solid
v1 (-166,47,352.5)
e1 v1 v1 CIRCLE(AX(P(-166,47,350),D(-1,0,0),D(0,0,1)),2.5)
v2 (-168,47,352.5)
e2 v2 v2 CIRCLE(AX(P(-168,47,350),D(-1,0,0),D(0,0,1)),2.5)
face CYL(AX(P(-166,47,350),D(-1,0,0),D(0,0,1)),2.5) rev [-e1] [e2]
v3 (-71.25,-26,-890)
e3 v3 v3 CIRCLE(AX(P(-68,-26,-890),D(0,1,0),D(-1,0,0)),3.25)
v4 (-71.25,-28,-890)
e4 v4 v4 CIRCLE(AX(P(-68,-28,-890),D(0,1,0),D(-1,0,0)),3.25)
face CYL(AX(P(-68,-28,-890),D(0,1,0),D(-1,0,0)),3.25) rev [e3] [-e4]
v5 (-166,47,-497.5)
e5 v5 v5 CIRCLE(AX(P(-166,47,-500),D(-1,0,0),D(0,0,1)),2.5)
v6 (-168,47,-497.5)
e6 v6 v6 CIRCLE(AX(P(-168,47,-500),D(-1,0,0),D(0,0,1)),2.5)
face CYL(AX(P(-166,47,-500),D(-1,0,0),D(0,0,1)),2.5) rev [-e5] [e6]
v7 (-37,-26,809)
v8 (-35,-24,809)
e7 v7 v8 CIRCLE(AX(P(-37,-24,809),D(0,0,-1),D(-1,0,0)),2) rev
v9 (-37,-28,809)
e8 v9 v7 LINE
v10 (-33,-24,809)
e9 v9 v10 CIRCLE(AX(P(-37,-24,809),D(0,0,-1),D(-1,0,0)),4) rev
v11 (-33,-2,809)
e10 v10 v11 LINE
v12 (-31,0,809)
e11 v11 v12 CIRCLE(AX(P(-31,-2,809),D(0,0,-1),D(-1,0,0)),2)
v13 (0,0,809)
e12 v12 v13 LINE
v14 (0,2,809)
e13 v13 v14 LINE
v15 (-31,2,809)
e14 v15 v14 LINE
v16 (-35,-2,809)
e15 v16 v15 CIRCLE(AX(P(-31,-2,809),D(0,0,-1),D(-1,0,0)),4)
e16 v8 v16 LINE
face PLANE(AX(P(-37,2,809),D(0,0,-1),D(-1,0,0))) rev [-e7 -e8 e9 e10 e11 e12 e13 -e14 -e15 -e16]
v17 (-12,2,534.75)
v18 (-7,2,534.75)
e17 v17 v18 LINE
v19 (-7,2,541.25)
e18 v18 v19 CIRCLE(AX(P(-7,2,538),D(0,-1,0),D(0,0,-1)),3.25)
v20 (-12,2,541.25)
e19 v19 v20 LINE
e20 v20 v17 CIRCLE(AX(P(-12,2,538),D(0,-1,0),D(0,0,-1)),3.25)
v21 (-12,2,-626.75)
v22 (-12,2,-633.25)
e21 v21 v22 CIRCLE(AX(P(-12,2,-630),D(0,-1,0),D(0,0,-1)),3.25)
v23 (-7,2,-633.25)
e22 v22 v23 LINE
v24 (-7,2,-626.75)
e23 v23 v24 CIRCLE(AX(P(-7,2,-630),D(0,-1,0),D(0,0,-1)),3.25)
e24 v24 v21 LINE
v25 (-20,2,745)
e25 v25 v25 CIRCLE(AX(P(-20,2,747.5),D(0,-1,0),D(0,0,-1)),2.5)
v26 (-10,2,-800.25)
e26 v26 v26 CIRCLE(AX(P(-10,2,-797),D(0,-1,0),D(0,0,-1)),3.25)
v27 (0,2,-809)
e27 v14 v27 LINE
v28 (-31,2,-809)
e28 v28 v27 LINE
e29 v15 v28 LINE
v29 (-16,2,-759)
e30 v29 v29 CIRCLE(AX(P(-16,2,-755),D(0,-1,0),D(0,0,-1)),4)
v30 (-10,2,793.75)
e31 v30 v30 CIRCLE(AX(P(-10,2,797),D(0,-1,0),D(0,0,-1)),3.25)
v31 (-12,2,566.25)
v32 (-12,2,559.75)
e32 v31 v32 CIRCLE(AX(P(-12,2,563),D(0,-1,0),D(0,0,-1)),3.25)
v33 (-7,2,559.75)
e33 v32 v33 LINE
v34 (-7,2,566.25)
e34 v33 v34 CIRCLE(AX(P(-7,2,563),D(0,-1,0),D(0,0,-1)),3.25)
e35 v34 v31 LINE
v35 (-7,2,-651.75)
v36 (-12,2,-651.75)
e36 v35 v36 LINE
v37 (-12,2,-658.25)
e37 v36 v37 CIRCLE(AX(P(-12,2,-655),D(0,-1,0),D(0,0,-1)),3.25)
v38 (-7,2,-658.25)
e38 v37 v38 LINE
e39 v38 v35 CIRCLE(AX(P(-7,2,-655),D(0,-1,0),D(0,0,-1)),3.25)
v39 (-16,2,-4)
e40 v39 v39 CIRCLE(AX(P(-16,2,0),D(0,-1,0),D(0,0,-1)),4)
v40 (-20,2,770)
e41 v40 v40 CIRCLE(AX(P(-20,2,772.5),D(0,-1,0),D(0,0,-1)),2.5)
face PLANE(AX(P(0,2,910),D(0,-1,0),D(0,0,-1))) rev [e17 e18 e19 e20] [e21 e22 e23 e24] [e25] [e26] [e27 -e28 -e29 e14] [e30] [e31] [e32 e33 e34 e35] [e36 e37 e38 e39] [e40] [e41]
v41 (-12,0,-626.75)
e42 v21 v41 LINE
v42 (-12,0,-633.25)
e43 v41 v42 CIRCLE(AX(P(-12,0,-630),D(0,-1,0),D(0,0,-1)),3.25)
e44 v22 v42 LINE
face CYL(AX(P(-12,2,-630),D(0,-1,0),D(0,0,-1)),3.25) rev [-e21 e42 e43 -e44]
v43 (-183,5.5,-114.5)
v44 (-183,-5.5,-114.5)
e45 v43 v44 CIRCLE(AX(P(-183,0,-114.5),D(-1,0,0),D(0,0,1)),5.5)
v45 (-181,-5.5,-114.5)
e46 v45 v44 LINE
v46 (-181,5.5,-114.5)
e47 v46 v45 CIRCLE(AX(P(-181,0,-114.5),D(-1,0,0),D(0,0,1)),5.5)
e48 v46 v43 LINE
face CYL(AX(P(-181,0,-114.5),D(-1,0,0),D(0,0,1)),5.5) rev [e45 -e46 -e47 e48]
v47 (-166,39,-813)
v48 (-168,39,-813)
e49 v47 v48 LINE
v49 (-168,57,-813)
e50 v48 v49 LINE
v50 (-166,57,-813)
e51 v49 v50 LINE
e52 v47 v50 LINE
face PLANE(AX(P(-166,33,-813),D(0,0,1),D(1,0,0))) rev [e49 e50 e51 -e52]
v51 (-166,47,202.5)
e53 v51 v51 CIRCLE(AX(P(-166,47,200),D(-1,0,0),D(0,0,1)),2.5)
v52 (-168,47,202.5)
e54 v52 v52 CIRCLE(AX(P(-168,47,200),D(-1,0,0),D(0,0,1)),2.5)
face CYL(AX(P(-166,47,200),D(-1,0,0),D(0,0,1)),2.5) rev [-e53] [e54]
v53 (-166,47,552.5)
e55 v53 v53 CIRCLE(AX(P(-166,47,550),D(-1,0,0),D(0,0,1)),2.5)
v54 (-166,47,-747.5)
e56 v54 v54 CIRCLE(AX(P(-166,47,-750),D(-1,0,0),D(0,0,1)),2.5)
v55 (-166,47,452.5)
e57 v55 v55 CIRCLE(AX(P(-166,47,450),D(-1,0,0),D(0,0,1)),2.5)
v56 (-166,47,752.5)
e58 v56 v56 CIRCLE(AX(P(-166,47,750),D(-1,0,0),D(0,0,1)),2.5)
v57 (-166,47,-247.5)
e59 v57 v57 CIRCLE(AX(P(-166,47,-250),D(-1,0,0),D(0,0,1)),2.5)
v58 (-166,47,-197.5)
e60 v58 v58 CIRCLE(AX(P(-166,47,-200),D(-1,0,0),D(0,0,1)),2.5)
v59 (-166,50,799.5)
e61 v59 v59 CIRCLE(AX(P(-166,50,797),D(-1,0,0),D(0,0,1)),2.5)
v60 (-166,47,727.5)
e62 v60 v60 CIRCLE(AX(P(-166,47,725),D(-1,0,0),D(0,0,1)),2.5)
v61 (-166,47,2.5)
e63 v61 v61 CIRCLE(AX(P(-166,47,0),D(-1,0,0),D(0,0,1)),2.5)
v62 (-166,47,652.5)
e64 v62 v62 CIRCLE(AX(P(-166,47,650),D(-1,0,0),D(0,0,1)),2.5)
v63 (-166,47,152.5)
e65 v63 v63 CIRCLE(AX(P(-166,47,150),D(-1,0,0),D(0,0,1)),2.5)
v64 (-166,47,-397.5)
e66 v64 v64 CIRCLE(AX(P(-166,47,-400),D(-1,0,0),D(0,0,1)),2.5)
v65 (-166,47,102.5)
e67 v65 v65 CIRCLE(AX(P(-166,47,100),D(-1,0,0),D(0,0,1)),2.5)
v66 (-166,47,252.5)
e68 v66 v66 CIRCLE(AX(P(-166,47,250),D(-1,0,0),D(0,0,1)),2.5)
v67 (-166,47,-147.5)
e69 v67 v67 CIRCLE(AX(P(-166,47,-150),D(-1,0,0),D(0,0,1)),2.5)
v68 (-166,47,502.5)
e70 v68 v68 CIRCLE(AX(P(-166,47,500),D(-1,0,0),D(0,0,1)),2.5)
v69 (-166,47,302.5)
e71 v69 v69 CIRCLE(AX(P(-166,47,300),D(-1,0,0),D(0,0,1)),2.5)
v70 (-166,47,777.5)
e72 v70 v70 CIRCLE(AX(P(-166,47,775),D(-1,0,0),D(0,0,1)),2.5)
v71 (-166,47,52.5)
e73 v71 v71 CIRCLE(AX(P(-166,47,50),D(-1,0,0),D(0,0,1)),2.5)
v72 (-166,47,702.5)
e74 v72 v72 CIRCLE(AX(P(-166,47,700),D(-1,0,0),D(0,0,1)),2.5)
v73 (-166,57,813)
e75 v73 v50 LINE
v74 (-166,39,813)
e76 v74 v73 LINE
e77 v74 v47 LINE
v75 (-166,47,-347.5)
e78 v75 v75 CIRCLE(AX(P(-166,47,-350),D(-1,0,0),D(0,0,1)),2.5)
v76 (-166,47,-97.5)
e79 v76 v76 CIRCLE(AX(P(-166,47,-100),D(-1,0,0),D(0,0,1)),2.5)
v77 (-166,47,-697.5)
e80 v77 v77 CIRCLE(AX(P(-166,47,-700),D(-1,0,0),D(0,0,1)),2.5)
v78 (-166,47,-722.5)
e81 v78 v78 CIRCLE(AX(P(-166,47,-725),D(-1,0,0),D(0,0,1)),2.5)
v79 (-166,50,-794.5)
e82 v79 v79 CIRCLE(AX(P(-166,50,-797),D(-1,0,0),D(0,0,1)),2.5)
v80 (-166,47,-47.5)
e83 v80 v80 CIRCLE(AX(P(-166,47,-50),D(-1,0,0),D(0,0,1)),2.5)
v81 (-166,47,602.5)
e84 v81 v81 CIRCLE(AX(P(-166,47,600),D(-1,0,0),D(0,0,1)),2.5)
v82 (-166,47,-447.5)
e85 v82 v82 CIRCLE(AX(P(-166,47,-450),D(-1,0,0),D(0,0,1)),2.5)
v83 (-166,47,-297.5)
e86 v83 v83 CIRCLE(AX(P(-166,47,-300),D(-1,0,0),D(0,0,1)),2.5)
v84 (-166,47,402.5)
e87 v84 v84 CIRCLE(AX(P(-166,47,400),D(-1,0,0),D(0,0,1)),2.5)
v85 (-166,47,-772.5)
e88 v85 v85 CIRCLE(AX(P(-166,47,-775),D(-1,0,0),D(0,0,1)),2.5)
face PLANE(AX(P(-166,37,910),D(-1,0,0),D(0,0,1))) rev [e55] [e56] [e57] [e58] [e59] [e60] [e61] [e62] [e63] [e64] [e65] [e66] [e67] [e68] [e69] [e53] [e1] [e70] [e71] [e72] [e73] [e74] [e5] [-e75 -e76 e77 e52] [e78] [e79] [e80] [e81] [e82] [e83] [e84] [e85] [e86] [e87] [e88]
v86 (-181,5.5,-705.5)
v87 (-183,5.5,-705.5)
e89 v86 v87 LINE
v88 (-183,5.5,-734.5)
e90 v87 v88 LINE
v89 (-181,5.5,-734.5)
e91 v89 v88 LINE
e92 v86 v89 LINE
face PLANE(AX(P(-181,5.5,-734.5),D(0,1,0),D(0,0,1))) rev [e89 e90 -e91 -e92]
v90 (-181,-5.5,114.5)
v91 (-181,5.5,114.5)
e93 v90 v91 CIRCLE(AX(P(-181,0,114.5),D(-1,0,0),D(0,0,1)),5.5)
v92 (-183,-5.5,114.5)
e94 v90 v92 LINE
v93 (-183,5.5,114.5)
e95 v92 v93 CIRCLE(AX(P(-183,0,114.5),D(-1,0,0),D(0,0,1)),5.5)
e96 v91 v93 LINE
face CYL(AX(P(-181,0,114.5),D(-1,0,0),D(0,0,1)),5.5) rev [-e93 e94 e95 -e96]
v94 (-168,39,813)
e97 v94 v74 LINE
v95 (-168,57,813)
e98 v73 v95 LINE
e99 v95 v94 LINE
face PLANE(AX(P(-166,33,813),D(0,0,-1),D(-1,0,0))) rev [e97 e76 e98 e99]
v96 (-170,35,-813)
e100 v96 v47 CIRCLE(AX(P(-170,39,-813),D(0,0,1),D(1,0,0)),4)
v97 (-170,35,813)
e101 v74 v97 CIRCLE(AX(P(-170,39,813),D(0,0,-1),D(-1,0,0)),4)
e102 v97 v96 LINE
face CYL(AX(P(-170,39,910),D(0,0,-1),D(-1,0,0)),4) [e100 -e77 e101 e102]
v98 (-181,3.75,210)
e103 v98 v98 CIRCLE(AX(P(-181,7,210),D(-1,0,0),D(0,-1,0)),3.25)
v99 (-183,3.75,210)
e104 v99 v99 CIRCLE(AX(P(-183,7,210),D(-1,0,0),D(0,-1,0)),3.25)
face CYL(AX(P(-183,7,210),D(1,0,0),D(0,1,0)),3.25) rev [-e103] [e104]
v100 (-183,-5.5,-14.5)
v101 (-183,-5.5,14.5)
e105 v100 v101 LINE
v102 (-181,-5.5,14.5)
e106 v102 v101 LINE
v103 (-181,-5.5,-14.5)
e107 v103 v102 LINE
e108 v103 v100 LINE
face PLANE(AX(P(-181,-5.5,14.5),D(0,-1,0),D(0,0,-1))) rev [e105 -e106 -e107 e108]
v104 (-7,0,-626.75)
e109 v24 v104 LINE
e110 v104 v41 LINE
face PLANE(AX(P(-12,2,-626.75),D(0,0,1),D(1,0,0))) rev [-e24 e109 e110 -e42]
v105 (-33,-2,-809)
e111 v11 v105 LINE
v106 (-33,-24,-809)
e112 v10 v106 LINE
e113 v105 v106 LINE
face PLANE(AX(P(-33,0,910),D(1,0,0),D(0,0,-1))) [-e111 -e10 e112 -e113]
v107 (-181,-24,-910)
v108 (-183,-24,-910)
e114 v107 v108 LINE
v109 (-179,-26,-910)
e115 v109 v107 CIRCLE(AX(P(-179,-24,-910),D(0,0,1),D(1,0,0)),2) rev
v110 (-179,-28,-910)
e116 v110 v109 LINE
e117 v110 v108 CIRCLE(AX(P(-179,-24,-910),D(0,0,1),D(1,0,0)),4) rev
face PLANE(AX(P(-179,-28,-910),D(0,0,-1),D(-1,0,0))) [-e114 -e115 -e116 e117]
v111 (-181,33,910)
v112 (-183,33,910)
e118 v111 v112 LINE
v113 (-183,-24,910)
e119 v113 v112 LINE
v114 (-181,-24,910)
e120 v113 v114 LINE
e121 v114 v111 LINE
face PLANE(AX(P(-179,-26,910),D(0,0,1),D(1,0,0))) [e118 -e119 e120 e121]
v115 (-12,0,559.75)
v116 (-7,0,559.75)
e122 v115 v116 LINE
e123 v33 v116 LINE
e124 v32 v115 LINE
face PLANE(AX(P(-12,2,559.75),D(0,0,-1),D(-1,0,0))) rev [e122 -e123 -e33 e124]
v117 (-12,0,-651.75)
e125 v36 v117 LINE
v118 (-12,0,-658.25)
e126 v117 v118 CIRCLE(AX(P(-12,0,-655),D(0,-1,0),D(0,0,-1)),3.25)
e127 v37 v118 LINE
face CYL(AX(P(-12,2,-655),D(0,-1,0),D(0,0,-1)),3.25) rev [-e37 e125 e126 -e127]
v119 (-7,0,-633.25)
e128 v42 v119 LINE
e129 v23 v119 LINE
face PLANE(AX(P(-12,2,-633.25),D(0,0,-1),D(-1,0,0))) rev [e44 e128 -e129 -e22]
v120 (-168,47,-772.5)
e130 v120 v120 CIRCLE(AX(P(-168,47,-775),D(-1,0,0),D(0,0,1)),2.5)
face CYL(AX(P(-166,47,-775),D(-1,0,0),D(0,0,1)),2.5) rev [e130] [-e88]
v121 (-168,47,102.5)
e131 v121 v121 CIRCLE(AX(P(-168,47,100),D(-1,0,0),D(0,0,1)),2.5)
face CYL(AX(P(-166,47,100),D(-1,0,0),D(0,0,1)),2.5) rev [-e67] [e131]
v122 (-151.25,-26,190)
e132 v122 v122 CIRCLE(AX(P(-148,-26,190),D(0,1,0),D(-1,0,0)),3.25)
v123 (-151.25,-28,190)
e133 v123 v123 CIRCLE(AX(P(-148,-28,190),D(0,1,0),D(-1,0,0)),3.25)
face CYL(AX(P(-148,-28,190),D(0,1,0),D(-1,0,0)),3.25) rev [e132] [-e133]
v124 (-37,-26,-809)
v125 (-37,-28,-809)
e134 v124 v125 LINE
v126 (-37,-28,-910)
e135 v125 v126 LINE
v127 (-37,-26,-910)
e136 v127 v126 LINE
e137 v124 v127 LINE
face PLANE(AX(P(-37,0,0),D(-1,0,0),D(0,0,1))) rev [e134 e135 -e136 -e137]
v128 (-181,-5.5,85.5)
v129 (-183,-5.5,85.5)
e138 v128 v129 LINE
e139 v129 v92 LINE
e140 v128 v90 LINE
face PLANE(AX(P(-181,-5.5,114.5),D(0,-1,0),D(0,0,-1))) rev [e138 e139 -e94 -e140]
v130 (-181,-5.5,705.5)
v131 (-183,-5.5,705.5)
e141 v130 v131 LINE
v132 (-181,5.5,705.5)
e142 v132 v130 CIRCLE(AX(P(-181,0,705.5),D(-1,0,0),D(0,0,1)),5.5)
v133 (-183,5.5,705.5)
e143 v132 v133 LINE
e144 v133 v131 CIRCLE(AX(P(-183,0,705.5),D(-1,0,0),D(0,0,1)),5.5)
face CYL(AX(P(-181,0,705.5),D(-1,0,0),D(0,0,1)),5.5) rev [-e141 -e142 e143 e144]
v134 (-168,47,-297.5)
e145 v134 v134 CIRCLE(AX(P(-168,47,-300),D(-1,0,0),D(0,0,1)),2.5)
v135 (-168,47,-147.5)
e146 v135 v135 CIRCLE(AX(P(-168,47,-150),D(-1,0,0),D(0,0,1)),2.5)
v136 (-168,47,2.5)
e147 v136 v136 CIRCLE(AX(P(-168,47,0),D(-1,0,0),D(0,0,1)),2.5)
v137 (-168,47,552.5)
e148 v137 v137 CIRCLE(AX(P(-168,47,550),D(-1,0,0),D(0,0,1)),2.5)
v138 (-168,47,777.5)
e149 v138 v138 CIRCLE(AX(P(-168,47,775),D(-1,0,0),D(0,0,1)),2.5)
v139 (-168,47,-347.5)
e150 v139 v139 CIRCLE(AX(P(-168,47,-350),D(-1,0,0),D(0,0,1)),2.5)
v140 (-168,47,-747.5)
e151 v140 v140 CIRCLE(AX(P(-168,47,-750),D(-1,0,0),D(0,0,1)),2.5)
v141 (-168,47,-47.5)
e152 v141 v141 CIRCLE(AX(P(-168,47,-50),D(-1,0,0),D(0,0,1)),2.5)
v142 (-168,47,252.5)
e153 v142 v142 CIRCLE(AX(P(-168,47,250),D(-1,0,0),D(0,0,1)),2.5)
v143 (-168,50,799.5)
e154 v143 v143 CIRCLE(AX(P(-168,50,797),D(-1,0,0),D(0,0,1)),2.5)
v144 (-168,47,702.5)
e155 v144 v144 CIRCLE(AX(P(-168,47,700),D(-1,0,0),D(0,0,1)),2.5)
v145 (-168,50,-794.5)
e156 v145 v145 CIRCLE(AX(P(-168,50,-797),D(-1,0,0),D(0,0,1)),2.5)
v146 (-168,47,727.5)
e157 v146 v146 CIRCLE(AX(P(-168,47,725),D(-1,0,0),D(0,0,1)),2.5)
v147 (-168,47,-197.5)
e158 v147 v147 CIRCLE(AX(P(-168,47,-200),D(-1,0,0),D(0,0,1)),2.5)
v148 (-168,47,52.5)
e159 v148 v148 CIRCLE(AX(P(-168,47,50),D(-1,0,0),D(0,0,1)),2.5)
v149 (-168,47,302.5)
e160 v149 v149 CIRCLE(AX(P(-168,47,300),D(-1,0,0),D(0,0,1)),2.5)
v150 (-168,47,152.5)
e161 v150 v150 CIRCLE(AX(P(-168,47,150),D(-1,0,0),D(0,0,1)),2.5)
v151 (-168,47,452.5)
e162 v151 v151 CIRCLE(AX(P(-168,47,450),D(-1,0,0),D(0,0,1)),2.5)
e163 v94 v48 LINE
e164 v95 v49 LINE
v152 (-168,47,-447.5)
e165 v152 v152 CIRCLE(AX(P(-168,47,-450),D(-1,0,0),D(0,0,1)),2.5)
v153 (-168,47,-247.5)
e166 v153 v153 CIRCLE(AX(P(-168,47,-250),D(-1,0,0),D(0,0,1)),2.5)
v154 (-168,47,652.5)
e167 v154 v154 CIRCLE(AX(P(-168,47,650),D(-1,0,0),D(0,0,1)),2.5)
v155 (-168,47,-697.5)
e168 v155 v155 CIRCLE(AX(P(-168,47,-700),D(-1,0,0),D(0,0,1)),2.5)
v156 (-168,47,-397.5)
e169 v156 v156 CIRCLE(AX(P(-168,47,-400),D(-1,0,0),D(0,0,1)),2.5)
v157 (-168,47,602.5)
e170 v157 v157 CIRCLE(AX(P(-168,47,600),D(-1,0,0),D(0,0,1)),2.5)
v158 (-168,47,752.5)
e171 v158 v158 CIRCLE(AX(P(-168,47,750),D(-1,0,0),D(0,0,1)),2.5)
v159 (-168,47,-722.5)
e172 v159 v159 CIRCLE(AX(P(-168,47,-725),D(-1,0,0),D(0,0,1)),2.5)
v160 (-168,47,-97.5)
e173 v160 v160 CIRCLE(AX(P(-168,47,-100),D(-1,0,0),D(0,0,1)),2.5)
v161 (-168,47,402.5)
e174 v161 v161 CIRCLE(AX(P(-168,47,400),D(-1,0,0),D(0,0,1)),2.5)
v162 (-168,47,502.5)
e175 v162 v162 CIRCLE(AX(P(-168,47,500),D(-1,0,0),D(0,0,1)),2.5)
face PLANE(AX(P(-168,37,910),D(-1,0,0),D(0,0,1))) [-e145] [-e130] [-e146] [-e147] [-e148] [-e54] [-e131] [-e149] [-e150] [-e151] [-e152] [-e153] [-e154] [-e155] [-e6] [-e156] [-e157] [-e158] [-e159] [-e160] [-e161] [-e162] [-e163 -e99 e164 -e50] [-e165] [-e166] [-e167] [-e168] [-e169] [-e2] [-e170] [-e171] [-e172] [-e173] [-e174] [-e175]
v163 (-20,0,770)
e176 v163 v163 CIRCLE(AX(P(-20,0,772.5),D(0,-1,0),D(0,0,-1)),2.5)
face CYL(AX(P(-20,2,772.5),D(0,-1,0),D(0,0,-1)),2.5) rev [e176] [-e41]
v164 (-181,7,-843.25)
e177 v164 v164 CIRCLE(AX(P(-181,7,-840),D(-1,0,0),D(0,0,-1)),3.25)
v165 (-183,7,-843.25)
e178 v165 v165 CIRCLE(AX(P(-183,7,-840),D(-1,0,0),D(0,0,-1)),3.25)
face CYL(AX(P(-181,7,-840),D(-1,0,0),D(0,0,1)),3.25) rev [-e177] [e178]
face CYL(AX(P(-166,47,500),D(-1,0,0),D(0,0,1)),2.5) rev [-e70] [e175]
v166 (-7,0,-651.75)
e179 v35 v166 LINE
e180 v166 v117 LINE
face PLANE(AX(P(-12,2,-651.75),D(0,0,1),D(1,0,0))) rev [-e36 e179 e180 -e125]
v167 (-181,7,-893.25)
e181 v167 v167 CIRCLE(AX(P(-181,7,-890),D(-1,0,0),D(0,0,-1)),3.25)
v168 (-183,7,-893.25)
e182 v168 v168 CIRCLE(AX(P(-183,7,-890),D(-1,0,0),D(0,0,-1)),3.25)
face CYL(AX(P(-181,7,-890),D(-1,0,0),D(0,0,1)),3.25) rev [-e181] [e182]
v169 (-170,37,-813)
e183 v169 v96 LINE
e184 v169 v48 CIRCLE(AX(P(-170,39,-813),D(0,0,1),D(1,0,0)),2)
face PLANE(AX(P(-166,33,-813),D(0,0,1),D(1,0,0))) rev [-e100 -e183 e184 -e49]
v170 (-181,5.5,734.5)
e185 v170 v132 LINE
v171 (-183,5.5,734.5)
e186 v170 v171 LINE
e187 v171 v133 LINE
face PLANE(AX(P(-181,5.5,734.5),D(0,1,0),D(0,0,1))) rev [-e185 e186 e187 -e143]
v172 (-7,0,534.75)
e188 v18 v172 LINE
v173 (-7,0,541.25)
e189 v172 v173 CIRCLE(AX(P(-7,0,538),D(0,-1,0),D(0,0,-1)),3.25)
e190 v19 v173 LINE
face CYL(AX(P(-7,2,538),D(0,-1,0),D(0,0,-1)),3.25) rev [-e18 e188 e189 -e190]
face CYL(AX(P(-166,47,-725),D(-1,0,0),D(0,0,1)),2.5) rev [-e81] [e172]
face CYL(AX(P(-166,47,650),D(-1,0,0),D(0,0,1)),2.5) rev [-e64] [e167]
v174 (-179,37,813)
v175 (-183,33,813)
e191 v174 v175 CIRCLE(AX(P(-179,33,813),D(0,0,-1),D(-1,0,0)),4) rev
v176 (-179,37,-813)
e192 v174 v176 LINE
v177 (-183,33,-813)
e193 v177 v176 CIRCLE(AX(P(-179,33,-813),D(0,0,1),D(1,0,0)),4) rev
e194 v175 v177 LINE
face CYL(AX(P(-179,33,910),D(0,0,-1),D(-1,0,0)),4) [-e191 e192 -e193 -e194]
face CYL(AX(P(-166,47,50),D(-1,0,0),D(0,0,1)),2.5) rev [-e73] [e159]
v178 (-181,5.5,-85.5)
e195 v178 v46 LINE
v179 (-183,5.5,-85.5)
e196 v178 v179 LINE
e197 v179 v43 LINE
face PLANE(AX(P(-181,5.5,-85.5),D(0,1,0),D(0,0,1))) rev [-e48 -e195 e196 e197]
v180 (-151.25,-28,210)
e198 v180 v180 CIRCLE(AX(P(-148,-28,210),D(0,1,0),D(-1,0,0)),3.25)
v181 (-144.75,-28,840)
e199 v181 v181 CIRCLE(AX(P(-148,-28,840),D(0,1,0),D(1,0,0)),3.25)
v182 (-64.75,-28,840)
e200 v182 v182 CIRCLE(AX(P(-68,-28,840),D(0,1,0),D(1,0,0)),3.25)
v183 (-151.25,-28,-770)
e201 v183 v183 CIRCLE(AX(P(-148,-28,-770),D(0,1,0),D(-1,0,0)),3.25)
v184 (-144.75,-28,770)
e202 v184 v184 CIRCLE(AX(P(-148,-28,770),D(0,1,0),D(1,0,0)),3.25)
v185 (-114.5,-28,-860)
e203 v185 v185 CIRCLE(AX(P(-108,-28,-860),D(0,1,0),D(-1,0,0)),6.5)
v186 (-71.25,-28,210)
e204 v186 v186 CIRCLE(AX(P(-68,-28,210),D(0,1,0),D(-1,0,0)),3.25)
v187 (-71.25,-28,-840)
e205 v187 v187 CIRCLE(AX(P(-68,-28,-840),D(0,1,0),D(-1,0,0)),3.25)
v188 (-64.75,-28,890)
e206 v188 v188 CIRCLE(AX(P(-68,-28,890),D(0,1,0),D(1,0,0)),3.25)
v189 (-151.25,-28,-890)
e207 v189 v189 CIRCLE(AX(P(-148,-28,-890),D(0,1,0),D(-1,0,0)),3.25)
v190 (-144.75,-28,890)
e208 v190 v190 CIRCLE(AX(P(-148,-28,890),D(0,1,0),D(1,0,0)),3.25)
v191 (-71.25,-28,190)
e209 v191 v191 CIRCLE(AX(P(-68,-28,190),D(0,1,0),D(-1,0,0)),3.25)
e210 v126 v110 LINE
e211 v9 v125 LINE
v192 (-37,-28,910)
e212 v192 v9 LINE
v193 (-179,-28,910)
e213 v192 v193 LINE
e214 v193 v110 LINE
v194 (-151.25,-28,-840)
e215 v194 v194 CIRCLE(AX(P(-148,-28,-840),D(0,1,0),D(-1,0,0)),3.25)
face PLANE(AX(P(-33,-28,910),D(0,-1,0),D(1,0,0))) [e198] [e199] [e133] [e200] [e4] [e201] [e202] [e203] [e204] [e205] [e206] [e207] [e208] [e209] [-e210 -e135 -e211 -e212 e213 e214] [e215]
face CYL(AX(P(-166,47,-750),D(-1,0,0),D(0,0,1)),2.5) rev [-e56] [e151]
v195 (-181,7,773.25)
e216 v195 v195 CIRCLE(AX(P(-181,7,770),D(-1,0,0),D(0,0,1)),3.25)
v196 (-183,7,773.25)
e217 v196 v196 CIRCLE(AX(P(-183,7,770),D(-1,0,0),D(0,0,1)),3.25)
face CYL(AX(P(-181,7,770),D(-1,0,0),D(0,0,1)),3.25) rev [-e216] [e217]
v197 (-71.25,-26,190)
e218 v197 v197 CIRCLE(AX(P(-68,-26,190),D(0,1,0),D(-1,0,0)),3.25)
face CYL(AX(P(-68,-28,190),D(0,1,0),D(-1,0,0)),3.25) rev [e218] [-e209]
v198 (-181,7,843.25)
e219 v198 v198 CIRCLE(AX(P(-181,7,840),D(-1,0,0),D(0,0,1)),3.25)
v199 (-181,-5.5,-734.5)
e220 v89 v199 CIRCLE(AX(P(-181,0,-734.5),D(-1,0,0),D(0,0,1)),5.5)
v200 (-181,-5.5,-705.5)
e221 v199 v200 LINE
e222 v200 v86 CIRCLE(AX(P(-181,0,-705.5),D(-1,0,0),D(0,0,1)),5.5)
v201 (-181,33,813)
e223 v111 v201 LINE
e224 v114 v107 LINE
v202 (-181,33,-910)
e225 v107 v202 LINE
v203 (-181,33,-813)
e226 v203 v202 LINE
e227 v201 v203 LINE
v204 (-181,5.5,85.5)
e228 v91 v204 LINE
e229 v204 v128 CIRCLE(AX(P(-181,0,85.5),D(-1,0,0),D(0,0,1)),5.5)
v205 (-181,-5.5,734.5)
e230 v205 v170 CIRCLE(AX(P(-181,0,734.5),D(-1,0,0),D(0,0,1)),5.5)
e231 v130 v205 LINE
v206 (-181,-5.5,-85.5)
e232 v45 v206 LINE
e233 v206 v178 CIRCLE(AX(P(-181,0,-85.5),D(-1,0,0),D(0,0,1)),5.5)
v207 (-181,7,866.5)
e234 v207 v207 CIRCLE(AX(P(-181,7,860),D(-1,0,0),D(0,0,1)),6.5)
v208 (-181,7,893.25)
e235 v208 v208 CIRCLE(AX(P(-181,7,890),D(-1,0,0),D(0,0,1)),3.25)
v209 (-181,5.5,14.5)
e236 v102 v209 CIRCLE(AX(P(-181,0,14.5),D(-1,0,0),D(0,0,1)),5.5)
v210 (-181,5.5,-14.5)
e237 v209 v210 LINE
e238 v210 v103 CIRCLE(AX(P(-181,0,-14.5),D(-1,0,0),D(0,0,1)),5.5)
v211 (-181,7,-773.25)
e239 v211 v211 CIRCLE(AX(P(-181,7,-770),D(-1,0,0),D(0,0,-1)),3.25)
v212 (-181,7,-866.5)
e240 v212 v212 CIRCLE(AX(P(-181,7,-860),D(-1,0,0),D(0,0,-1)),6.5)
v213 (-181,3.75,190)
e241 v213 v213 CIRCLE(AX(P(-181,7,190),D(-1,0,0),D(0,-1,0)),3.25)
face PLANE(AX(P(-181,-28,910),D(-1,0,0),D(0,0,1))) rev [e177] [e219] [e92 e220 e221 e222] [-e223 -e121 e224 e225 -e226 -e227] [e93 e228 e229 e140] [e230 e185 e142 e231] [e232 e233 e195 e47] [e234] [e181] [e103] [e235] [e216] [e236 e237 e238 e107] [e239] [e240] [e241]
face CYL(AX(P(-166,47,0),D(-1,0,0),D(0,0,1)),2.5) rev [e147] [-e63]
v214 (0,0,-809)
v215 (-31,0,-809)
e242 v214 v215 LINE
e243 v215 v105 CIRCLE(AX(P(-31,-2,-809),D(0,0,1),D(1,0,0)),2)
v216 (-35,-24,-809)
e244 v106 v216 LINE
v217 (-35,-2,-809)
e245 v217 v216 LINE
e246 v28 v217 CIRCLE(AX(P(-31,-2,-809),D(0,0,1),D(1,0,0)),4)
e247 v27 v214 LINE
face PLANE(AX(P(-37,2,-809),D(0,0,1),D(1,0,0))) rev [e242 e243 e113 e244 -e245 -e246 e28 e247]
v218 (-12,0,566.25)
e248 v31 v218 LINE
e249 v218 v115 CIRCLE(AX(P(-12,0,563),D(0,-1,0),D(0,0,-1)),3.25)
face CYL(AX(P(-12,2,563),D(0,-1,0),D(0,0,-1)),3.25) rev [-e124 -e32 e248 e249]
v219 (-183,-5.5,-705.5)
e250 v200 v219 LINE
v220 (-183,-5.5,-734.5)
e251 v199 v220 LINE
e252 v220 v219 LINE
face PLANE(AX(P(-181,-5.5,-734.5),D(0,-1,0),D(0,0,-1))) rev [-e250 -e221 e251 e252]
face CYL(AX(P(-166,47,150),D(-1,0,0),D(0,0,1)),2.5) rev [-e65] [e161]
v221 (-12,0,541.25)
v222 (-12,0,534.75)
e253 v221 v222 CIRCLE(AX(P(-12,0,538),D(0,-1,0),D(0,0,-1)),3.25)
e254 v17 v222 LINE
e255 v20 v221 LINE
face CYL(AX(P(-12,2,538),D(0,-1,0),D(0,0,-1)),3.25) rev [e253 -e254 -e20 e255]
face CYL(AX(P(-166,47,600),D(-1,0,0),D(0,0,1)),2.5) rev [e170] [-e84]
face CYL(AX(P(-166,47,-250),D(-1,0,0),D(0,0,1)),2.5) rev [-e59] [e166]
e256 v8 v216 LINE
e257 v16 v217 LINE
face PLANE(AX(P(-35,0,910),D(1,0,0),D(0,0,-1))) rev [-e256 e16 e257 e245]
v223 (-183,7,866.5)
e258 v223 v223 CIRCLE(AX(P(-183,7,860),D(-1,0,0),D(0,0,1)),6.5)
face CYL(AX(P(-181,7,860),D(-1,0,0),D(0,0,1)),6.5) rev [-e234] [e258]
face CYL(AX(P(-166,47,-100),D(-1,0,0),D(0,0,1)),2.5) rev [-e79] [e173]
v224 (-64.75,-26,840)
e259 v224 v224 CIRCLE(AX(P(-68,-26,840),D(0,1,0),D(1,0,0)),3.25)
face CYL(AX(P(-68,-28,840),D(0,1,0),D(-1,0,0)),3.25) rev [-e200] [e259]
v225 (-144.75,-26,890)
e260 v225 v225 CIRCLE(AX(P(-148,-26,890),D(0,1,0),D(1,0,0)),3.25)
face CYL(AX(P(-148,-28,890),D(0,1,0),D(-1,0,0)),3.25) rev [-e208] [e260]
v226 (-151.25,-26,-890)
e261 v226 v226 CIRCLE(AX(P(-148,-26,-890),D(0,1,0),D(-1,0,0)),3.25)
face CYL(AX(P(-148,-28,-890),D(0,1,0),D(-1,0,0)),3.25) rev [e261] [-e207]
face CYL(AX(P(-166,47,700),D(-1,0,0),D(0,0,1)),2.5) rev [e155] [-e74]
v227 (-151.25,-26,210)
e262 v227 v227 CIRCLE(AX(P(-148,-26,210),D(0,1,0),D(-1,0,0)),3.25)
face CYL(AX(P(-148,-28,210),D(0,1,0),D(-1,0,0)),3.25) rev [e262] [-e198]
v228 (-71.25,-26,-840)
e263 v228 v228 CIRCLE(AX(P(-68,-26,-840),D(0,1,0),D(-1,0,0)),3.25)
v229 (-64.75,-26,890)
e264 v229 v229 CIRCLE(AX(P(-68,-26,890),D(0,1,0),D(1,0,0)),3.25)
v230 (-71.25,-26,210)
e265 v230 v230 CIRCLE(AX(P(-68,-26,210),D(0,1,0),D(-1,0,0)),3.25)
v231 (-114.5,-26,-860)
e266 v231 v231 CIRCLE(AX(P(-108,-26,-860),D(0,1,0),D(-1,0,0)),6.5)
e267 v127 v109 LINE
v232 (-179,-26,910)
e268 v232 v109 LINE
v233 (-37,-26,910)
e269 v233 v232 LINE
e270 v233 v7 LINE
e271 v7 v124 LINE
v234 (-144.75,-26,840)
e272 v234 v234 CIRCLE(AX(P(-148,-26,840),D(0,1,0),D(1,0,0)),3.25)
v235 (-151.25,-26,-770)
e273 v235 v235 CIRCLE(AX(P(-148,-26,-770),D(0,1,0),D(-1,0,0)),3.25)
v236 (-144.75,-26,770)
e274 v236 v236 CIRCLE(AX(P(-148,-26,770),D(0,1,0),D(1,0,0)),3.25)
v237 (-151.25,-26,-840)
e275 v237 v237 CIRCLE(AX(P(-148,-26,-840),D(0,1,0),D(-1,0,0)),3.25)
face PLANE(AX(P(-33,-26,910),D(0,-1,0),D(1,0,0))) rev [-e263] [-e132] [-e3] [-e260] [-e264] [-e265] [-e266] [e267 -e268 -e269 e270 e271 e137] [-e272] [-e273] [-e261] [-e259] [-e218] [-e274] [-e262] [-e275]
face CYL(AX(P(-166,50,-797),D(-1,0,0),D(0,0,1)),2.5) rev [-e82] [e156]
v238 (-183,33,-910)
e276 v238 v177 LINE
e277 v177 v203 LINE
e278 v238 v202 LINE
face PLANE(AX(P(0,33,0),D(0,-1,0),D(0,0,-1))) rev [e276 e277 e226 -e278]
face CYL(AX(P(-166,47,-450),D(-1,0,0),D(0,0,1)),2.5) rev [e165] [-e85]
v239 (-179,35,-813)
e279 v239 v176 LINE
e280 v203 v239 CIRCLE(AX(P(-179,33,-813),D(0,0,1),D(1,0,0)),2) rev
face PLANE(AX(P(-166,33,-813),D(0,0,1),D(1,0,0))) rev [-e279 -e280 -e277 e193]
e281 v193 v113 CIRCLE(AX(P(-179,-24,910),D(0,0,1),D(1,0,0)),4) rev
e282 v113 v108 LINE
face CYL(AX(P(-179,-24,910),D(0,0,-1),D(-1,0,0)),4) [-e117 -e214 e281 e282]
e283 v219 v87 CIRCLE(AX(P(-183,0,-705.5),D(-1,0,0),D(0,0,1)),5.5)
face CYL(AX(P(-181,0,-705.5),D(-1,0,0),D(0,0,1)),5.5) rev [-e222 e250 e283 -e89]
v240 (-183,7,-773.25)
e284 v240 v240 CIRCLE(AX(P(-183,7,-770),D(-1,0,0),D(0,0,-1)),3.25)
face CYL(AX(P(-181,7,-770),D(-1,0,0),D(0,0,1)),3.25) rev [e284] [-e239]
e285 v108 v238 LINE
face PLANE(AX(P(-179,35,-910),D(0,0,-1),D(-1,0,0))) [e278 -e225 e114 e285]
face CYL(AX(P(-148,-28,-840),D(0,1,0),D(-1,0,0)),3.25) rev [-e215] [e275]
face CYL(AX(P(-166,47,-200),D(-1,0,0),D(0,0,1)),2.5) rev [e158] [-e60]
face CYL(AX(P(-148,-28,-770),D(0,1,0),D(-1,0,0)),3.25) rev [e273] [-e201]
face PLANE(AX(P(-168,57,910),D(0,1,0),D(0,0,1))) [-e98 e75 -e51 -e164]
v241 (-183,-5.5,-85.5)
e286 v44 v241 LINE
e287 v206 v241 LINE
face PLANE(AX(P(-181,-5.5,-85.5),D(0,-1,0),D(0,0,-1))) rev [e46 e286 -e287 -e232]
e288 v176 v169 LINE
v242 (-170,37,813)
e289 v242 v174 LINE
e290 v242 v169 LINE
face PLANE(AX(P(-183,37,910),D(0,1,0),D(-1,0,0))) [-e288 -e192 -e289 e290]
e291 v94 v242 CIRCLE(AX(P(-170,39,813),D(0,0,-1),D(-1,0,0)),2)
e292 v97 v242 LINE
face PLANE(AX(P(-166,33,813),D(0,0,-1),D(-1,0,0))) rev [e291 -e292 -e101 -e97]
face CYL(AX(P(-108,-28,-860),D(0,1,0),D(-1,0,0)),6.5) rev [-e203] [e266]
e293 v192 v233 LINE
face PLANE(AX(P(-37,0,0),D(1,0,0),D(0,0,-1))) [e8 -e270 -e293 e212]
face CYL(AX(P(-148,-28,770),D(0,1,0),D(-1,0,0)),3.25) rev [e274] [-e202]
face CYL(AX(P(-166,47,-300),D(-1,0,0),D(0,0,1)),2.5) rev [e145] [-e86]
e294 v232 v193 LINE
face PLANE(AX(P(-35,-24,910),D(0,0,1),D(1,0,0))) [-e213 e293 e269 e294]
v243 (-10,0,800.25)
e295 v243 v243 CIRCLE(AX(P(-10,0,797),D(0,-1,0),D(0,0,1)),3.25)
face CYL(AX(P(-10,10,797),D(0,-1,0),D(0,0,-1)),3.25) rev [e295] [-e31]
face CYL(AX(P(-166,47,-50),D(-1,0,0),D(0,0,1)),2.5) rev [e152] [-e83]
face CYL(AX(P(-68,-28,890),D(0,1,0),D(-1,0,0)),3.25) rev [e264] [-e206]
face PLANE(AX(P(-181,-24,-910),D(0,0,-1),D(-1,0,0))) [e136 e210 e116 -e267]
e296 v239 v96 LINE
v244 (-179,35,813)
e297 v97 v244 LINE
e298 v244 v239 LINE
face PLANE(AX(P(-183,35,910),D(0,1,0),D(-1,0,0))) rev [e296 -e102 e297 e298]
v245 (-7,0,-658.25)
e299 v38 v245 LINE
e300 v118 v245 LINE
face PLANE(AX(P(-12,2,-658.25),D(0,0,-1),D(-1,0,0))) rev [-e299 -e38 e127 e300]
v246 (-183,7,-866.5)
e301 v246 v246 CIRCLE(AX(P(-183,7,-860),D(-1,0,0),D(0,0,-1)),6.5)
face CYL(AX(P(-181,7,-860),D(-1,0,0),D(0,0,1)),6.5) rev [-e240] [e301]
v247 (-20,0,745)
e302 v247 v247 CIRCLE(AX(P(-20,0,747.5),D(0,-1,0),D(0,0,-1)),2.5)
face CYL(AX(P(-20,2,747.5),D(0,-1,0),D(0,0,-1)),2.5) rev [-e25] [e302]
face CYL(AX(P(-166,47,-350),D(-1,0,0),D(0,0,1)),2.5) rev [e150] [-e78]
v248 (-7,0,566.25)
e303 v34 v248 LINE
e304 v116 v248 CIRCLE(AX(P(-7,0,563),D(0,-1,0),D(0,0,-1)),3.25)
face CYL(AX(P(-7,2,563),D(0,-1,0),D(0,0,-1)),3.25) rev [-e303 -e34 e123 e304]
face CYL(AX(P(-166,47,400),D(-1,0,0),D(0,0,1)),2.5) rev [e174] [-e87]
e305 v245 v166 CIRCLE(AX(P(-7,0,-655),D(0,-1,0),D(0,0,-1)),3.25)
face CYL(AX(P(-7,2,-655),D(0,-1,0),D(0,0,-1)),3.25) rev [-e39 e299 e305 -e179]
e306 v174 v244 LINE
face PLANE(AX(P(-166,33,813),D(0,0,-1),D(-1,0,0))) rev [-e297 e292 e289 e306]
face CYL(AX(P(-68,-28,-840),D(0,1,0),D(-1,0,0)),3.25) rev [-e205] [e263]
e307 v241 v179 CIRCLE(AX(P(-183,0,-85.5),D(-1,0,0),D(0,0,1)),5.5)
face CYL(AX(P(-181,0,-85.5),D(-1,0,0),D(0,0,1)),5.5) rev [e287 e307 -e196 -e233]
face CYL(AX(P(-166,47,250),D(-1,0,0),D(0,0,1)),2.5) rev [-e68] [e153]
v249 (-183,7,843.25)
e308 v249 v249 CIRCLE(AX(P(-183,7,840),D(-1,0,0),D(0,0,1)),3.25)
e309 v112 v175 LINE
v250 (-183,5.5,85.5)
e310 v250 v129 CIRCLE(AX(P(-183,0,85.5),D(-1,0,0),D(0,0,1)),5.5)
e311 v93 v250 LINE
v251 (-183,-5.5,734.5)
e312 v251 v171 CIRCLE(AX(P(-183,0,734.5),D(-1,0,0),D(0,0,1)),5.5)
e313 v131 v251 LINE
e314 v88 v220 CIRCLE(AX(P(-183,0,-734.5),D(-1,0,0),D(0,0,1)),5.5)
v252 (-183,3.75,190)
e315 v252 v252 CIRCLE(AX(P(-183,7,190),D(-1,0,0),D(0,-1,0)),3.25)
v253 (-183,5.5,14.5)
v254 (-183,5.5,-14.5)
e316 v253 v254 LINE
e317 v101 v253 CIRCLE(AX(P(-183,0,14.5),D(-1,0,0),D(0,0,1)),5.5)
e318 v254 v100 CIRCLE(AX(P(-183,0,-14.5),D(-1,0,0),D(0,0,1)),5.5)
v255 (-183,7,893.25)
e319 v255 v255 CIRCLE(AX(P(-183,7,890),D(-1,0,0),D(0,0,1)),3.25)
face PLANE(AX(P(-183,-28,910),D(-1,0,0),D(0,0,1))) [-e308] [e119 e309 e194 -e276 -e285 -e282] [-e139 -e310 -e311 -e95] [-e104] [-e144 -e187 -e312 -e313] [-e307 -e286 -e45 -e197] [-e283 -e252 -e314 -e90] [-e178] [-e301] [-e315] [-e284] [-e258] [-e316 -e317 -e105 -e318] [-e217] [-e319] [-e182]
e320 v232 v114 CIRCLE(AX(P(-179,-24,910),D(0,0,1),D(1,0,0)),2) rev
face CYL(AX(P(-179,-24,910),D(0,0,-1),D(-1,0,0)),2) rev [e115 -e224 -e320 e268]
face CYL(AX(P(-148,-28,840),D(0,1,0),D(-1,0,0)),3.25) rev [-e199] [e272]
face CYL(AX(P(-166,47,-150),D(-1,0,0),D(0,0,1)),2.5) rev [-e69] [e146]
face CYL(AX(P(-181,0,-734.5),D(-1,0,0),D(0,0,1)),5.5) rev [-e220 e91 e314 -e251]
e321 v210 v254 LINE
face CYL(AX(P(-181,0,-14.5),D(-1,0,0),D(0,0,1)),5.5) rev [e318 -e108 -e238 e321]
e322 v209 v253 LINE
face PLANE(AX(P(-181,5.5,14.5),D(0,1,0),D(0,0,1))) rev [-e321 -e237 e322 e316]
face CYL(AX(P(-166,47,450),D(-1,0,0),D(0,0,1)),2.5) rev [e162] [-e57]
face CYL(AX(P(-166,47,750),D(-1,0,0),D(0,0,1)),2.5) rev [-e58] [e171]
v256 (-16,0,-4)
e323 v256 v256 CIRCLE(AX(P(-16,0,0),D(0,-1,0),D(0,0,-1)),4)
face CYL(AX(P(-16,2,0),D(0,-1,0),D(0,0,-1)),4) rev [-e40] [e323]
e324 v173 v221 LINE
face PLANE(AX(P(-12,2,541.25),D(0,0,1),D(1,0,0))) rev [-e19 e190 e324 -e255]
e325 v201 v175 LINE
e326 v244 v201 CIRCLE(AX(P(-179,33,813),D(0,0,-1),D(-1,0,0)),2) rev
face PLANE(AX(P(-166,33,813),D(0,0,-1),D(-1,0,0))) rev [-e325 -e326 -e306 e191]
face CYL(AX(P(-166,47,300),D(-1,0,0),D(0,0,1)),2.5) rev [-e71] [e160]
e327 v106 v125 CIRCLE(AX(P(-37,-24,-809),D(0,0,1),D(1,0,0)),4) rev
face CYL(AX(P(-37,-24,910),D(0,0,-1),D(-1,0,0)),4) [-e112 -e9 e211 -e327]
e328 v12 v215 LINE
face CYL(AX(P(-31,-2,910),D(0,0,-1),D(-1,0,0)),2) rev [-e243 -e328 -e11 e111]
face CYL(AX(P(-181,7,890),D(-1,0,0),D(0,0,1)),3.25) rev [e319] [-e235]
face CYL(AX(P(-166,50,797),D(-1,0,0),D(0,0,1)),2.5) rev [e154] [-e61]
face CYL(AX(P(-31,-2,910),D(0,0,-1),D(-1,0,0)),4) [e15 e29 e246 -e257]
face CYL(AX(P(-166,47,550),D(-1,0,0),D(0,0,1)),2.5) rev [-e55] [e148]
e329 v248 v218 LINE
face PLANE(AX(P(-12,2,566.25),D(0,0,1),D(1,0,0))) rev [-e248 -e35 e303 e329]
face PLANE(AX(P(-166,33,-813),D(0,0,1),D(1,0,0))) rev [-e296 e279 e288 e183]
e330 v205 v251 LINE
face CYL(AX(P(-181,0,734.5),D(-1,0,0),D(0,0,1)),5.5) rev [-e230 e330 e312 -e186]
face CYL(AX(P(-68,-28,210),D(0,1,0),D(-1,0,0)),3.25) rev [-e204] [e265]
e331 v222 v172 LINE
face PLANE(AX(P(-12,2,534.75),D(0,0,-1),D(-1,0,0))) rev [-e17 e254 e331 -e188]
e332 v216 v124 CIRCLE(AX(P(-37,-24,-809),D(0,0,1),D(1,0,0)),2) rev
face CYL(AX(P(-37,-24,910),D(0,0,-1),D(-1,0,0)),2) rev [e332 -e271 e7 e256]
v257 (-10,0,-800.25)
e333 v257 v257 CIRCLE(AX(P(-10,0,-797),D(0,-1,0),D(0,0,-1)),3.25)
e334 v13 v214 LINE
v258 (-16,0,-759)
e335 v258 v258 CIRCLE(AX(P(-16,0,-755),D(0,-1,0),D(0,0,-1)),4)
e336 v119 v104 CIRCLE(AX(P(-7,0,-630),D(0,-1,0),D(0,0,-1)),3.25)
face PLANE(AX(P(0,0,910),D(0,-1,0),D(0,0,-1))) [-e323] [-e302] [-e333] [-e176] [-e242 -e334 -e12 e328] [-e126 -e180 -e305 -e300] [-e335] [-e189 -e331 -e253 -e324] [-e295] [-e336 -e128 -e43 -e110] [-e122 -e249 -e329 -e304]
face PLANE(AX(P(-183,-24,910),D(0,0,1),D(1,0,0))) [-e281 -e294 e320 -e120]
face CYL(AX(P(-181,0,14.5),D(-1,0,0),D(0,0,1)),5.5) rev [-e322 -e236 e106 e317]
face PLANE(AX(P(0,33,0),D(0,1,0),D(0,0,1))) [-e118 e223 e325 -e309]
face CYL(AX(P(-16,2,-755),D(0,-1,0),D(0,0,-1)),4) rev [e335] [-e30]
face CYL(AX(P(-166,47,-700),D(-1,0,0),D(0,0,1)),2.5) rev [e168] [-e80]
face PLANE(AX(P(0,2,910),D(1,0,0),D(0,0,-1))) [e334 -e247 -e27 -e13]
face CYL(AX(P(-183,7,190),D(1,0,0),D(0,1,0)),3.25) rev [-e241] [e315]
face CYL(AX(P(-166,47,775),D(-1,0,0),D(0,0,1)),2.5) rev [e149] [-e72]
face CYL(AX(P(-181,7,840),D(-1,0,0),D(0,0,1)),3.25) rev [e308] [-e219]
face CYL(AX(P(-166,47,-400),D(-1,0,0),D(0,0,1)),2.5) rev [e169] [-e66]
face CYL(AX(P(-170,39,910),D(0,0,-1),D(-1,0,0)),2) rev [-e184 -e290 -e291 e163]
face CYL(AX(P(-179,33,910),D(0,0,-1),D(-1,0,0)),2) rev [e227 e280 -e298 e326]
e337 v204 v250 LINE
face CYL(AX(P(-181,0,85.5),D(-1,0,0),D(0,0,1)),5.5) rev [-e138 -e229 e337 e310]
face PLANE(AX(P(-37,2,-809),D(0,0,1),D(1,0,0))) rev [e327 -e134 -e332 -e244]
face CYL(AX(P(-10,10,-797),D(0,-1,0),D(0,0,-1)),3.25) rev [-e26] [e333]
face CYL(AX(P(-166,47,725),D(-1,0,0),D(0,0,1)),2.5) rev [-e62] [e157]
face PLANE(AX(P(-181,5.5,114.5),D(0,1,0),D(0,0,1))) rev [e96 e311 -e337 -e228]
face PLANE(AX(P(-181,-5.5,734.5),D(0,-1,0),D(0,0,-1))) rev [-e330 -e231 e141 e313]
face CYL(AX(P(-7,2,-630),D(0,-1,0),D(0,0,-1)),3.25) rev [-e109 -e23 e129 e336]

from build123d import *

# Parameters (mm, degrees)
SM_BASE_FLANGE_1_DEPTH = 910
SKETCH_6_W             = 101
SKETCH_6_H             = 30
CUT_EXTRUDE_1_DEPTH    = 37
SKETCH_7_W             = 17
SKETCH_7_H             = 97
CUT_EXTRUDE_2_DEPTH    = 24
SKETCH_8_R             = 6.5
SKETCH_8_R_2           = 3.25
CUT_EXTRUDE_3_DEPTH    = 10
SKETCH_9_R             = 3.25
CUT_EXTRUDE_4_DEPTH    = 10
CUT_EXTRUDE_7_DEPTH    = 10
CUT_EXTRUDE_8_DEPTH    = 10
SKETCH_16_R            = 3.25
SKETCH_16_R_2          = 6.5
CUT_EXTRUDE_9_DEPTH    = 10
SKETCH_17_R            = 2.5
CUT_EXTRUDE_10_DEPTH   = 10
SKETCH_25_R            = 4
SKETCH_25_R_2          = 2.5
CUT_EXTRUDE_16_DEPTH   = 10
SKETCH_26_R            = 3.25
CUT_EXTRUDE_17_DEPTH   = 10


# Sheet-metal steps are written as plain solids
with BuildPart() as part:
    # Sketch 1 → Базовая кромка1 (new, symmetric)
    with BuildSketch(Plane.XY):
        with BuildLine():
            Line((0, 0), (-31, 0))
            ThreePointArc((-31, 0), (-32.414213562, -0.585786438), (-33, -2))
            Line((-33, -2), (-33, -24))
            ThreePointArc((-33, -24), (-34.171572875, -26.828427125), (-37, -28))
            Line((-37, -28), (-179, -28))
            ThreePointArc((-179, -28), (-181.828427125, -26.828427125), (-183, -24))
            Line((-183, -24), (-183, 33))
            ThreePointArc((-183, 33), (-181.828427125, 35.828427125), (-179, 37))
            Line((-179, 37), (-170, 37))
            ThreePointArc((-170, 37), (-168.585786438, 37.585786438), (-168, 39))
            Line((-168, 39), (-168, 57))
            Line((-168, 57), (-166, 57))
            Line((-166, 57), (-166, 39))
            ThreePointArc((-166, 39), (-167.171572875, 36.171572875), (-170, 35))
            Line((-170, 35), (-179, 35))
            ThreePointArc((-179, 35), (-180.414213562, 34.414213562), (-181, 33))
            Line((-181, 33), (-181, -24))
            ThreePointArc((-181, -24), (-180.414213562, -25.414213562), (-179, -26))
            Line((-179, -26), (-37, -26))
            ThreePointArc((-37, -26), (-35.585786438, -25.414213562), (-35, -24))
            Line((-35, -24), (-35, -2))
            ThreePointArc((-35, -2), (-33.828427125, 0.828427125), (-31, 2))
            Line((-31, 2), (0, 2))
            Line((0, 2), (0, 0))
        make_face()
    extrude(amount=SM_BASE_FLANGE_1_DEPTH, both=True)

    # Эскиз6 → Cut-Extrude 1 (cut)
    with BuildSketch(Plane(origin=(0, 0, 0), x_dir=(0, 0, -1), z_dir=(1, 0, 0))):
        with Locations((-859.5, -13)):
            Rectangle(SKETCH_6_W, SKETCH_6_H)
        with Locations((859.5, -13)):
            Rectangle(SKETCH_6_W, SKETCH_6_H)
    extrude(amount=-CUT_EXTRUDE_1_DEPTH, mode=Mode.SUBTRACT)

    # Эскиз7 → Вырез-Вытянуть2 (cut)
    with BuildSketch(Plane(origin=(0, 57, 0), x_dir=(1, 0, 0), z_dir=(0, 1, 0))):
        with Locations((-174.5, -861.5)):
            Rectangle(SKETCH_7_W, SKETCH_7_H)
        with Locations((-174.5, 861.5)):
            Rectangle(SKETCH_7_W, SKETCH_7_H)
    extrude(amount=-CUT_EXTRUDE_2_DEPTH, mode=Mode.SUBTRACT)

    # Эскиз8 → Вырез-Вытянуть3 (cut)
    with BuildSketch(Plane(origin=(0, -26, 0), x_dir=(1, 0, 0), z_dir=(0, 1, 0))):
        with Locations(Location((-108, 860, 0), (0, 0, 180))):
            Circle(SKETCH_8_R)
        with Locations(Location((-68, 890, 0), (0, 0, 180))):
            Circle(SKETCH_8_R_2)
        with Locations(Location((-148, 890, 0), (0, 0, 180))):
            Circle(SKETCH_8_R_2)
        with Locations(Location((-148, 840, 0), (0, 0, 180))):
            Circle(SKETCH_8_R_2)
        with Locations(Location((-68, 840, 0), (0, 0, 180))):
            Circle(SKETCH_8_R_2)
        with Locations(Location((-148, 770, 0), (0, 0, 180))):
            Circle(SKETCH_8_R_2)
        with Locations((-148, -770)):
            Circle(SKETCH_8_R_2)
        with Locations((-148, -890)):
            Circle(SKETCH_8_R_2)
        with Locations((-148, -840)):
            Circle(SKETCH_8_R_2)
        with Locations((-68, -840)):
            Circle(SKETCH_8_R_2)
        with Locations((-68, -890)):
            Circle(SKETCH_8_R_2)
    extrude(amount=-CUT_EXTRUDE_3_DEPTH, mode=Mode.SUBTRACT)

    # Эскиз9 → Вырез-Вытянуть4 (cut)
    with BuildSketch(Plane(origin=(0, -26, 0), x_dir=(1, 0, 0), z_dir=(0, 1, 0))):
        with Locations(Location((-68, -190, 0), (0, 0, 180))):
            Circle(SKETCH_9_R)
        with Locations(Location((-148, -190, 0), (0, 0, 180))):
            Circle(SKETCH_9_R)
        with Locations(Location((-148, -210, 0), (0, 0, 180))):
            Circle(SKETCH_9_R)
        with Locations(Location((-68, -210, 0), (0, 0, 180))):
            Circle(SKETCH_9_R)
    cut_extrude_4 = extrude(amount=-CUT_EXTRUDE_4_DEPTH, mode=Mode.SUBTRACT)

    # Зеркальное отражение1: Вырез-Вытянуть4 across plane
    add(cut_extrude_4.mirror(Plane(origin=(-77.5, 77.5, 0), x_dir=(0, 0, 1), z_dir=(-0.7071067811865476, 0.7071067811865475, 0))), mode=Mode.SUBTRACT)

    # Эскиз14 → Вырез-Вытянуть7 (cut)
    with BuildSketch(Plane.XZ):
        with BuildLine():
            Line((-12, 566.25), (-7, 566.25))
            ThreePointArc((-7, 566.25), (-3.75, 563), (-7, 559.75))
            Line((-7, 559.75), (-12, 559.75))
            ThreePointArc((-12, 559.75), (-15.25, 563), (-12, 566.25))
        make_face()
        with BuildLine():
            Line((-12, 541.25), (-7, 541.25))
            ThreePointArc((-7, 541.25), (-3.75, 538), (-7, 534.75))
            Line((-7, 534.75), (-12, 534.75))
            ThreePointArc((-12, 534.75), (-15.25, 538), (-12, 541.25))
        make_face()
        with BuildLine():
            Line((-12, -626.75), (-7, -626.75))
            ThreePointArc((-7, -626.75), (-3.75, -630), (-7, -633.25))
            Line((-7, -633.25), (-12, -633.25))
            ThreePointArc((-12, -633.25), (-15.25, -630), (-12, -626.75))
        make_face()
        with BuildLine():
            Line((-12, -651.75), (-7, -651.75))
            ThreePointArc((-7, -651.75), (-3.75, -655), (-7, -658.25))
            Line((-7, -658.25), (-12, -658.25))
            ThreePointArc((-12, -658.25), (-15.25, -655), (-12, -651.75))
        make_face()
    extrude(amount=-CUT_EXTRUDE_7_DEPTH, mode=Mode.SUBTRACT)

    # Эскиз15 → Вырез-Вытянуть8 (cut)
    with BuildSketch(Plane.ZY.offset(183)):
        with BuildLine():
            Line((-734.5, 5.5), (-705.5, 5.5))
            ThreePointArc((-705.5, 5.5), (-700, 0), (-705.5, -5.5))
            Line((-705.5, -5.5), (-734.5, -5.5))
            ThreePointArc((-734.5, -5.5), (-740, 0), (-734.5, 5.5))
        make_face()
        with BuildLine():
            Line((-85.5, -5.5), (-114.5, -5.5))
            ThreePointArc((-114.5, -5.5), (-120, 0), (-114.5, 5.5))
            Line((-114.5, 5.5), (-85.5, 5.5))
            ThreePointArc((-85.5, 5.5), (-80, 0), (-85.5, -5.5))
        make_face()
        with BuildLine():
            Line((14.5, -5.5), (-14.5, -5.5))
            ThreePointArc((-14.5, -5.5), (-20, 0), (-14.5, 5.5))
            Line((-14.5, 5.5), (14.5, 5.5))
            ThreePointArc((14.5, 5.5), (20, 0), (14.5, -5.5))
        make_face()
        with BuildLine():
            Line((114.5, -5.5), (85.5, -5.5))
            ThreePointArc((85.5, -5.5), (80, 0), (85.5, 5.5))
            Line((85.5, 5.5), (114.5, 5.5))
            ThreePointArc((114.5, 5.5), (120, 0), (114.5, -5.5))
        make_face()
        with BuildLine():
            Line((734.5, -5.5), (705.5, -5.5))
            ThreePointArc((705.5, -5.5), (700, 0), (705.5, 5.5))
            Line((705.5, 5.5), (734.5, 5.5))
            ThreePointArc((734.5, 5.5), (740, 0), (734.5, -5.5))
        make_face()
    extrude(amount=-CUT_EXTRUDE_8_DEPTH, mode=Mode.SUBTRACT)

    # Эскиз16 → Вырез-Вытянуть9 (cut)
    with BuildSketch(Plane.ZY.offset(183)):
        with Locations((890, 7)):
            Circle(SKETCH_16_R)
        with Locations((860, 7)):
            Circle(SKETCH_16_R_2)
        with Locations((840, 7)):
            Circle(SKETCH_16_R)
        with Locations((770, 7)):
            Circle(SKETCH_16_R)
        with Locations(Location((-770, 7, 0), (0, 0, 180))):
            Circle(SKETCH_16_R)
        with Locations(Location((-840, 7, 0), (0, 0, 180))):
            Circle(SKETCH_16_R)
        with Locations(Location((-860, 7, 0), (0, 0, 180))):
            Circle(SKETCH_16_R_2)
        with Locations(Location((-890, 7, 0), (0, 0, 180))):
            Circle(SKETCH_16_R)
    extrude(amount=-CUT_EXTRUDE_9_DEPTH, mode=Mode.SUBTRACT)

    # Эскиз17 → Вырез-Вытянуть10 (cut)
    with BuildSketch(Plane.ZY.offset(168)):
        with Locations((775, 47)):
            Circle(SKETCH_17_R)
        with Locations((-500, 47)):
            Circle(SKETCH_17_R)
        with Locations((-775, 47)):
            Circle(SKETCH_17_R)
        with Locations((-797, 50)):
            Circle(SKETCH_17_R)
        with Locations((797, 50)):
            Circle(SKETCH_17_R)
        with Locations((-750, 47)):
            Circle(SKETCH_17_R)
        with Locations((-725, 47)):
            Circle(SKETCH_17_R)
        with Locations((-700, 47)):
            Circle(SKETCH_17_R)
        with Locations((-450, 47)):
            Circle(SKETCH_17_R)
        with Locations((-400, 47)):
            Circle(SKETCH_17_R)
        with Locations((-350, 47)):
            Circle(SKETCH_17_R)
        with Locations((-300, 47)):
            Circle(SKETCH_17_R)
        with Locations((-250, 47)):
            Circle(SKETCH_17_R)
        with Locations((-200, 47)):
            Circle(SKETCH_17_R)
        with Locations((-150, 47)):
            Circle(SKETCH_17_R)
        with Locations((-100, 47)):
            Circle(SKETCH_17_R)
        with Locations((-50, 47)):
            Circle(SKETCH_17_R)
        with Locations((0, 47)):
            Circle(SKETCH_17_R)
        with Locations((50, 47)):
            Circle(SKETCH_17_R)
        with Locations((100, 47)):
            Circle(SKETCH_17_R)
        with Locations((150, 47)):
            Circle(SKETCH_17_R)
        with Locations((200, 47)):
            Circle(SKETCH_17_R)
        with Locations((250, 47)):
            Circle(SKETCH_17_R)
        with Locations((300, 47)):
            Circle(SKETCH_17_R)
        with Locations((350, 47)):
            Circle(SKETCH_17_R)
        with Locations((750, 47)):
            Circle(SKETCH_17_R)
        with Locations((725, 47)):
            Circle(SKETCH_17_R)
        with Locations((700, 47)):
            Circle(SKETCH_17_R)
        with Locations((400, 47)):
            Circle(SKETCH_17_R)
        with Locations((450, 47)):
            Circle(SKETCH_17_R)
        with Locations((500, 47)):
            Circle(SKETCH_17_R)
        with Locations((550, 47)):
            Circle(SKETCH_17_R)
        with Locations((600, 47)):
            Circle(SKETCH_17_R)
        with Locations((650, 47)):
            Circle(SKETCH_17_R)
    extrude(amount=-CUT_EXTRUDE_10_DEPTH, mode=Mode.SUBTRACT)

    # Эскиз25 → Вырез-Вытянуть16 (cut)
    with BuildSketch(Plane.XZ):
        with Locations(Location((-16, -755, 0), (0, 0, 270))):
            Circle(SKETCH_25_R)
        with Locations(Location((-16, 0, 0), (0, 0, 270))):
            Circle(SKETCH_25_R)
        with Locations(Location((-20, 772.5, 0), (0, 0, 270))):
            Circle(SKETCH_25_R_2)
        with Locations(Location((-20, 747.5, 0), (0, 0, 270))):
            Circle(SKETCH_25_R_2)
    extrude(amount=-CUT_EXTRUDE_16_DEPTH, mode=Mode.SUBTRACT)

    # Эскиз26 → Вырез-Вытянуть17 (cut)
    with BuildSketch(Plane.XZ):
        with Locations(Location((-10, -797, 0), (0, 0, 270))):
            Circle(SKETCH_26_R)
        with Locations(Location((-10, 797, 0), (0, 0, 270))):
            Circle(SKETCH_26_R)
    extrude(amount=-CUT_EXTRUDE_17_DEPTH, mode=Mode.SUBTRACT)


solid = part.part
